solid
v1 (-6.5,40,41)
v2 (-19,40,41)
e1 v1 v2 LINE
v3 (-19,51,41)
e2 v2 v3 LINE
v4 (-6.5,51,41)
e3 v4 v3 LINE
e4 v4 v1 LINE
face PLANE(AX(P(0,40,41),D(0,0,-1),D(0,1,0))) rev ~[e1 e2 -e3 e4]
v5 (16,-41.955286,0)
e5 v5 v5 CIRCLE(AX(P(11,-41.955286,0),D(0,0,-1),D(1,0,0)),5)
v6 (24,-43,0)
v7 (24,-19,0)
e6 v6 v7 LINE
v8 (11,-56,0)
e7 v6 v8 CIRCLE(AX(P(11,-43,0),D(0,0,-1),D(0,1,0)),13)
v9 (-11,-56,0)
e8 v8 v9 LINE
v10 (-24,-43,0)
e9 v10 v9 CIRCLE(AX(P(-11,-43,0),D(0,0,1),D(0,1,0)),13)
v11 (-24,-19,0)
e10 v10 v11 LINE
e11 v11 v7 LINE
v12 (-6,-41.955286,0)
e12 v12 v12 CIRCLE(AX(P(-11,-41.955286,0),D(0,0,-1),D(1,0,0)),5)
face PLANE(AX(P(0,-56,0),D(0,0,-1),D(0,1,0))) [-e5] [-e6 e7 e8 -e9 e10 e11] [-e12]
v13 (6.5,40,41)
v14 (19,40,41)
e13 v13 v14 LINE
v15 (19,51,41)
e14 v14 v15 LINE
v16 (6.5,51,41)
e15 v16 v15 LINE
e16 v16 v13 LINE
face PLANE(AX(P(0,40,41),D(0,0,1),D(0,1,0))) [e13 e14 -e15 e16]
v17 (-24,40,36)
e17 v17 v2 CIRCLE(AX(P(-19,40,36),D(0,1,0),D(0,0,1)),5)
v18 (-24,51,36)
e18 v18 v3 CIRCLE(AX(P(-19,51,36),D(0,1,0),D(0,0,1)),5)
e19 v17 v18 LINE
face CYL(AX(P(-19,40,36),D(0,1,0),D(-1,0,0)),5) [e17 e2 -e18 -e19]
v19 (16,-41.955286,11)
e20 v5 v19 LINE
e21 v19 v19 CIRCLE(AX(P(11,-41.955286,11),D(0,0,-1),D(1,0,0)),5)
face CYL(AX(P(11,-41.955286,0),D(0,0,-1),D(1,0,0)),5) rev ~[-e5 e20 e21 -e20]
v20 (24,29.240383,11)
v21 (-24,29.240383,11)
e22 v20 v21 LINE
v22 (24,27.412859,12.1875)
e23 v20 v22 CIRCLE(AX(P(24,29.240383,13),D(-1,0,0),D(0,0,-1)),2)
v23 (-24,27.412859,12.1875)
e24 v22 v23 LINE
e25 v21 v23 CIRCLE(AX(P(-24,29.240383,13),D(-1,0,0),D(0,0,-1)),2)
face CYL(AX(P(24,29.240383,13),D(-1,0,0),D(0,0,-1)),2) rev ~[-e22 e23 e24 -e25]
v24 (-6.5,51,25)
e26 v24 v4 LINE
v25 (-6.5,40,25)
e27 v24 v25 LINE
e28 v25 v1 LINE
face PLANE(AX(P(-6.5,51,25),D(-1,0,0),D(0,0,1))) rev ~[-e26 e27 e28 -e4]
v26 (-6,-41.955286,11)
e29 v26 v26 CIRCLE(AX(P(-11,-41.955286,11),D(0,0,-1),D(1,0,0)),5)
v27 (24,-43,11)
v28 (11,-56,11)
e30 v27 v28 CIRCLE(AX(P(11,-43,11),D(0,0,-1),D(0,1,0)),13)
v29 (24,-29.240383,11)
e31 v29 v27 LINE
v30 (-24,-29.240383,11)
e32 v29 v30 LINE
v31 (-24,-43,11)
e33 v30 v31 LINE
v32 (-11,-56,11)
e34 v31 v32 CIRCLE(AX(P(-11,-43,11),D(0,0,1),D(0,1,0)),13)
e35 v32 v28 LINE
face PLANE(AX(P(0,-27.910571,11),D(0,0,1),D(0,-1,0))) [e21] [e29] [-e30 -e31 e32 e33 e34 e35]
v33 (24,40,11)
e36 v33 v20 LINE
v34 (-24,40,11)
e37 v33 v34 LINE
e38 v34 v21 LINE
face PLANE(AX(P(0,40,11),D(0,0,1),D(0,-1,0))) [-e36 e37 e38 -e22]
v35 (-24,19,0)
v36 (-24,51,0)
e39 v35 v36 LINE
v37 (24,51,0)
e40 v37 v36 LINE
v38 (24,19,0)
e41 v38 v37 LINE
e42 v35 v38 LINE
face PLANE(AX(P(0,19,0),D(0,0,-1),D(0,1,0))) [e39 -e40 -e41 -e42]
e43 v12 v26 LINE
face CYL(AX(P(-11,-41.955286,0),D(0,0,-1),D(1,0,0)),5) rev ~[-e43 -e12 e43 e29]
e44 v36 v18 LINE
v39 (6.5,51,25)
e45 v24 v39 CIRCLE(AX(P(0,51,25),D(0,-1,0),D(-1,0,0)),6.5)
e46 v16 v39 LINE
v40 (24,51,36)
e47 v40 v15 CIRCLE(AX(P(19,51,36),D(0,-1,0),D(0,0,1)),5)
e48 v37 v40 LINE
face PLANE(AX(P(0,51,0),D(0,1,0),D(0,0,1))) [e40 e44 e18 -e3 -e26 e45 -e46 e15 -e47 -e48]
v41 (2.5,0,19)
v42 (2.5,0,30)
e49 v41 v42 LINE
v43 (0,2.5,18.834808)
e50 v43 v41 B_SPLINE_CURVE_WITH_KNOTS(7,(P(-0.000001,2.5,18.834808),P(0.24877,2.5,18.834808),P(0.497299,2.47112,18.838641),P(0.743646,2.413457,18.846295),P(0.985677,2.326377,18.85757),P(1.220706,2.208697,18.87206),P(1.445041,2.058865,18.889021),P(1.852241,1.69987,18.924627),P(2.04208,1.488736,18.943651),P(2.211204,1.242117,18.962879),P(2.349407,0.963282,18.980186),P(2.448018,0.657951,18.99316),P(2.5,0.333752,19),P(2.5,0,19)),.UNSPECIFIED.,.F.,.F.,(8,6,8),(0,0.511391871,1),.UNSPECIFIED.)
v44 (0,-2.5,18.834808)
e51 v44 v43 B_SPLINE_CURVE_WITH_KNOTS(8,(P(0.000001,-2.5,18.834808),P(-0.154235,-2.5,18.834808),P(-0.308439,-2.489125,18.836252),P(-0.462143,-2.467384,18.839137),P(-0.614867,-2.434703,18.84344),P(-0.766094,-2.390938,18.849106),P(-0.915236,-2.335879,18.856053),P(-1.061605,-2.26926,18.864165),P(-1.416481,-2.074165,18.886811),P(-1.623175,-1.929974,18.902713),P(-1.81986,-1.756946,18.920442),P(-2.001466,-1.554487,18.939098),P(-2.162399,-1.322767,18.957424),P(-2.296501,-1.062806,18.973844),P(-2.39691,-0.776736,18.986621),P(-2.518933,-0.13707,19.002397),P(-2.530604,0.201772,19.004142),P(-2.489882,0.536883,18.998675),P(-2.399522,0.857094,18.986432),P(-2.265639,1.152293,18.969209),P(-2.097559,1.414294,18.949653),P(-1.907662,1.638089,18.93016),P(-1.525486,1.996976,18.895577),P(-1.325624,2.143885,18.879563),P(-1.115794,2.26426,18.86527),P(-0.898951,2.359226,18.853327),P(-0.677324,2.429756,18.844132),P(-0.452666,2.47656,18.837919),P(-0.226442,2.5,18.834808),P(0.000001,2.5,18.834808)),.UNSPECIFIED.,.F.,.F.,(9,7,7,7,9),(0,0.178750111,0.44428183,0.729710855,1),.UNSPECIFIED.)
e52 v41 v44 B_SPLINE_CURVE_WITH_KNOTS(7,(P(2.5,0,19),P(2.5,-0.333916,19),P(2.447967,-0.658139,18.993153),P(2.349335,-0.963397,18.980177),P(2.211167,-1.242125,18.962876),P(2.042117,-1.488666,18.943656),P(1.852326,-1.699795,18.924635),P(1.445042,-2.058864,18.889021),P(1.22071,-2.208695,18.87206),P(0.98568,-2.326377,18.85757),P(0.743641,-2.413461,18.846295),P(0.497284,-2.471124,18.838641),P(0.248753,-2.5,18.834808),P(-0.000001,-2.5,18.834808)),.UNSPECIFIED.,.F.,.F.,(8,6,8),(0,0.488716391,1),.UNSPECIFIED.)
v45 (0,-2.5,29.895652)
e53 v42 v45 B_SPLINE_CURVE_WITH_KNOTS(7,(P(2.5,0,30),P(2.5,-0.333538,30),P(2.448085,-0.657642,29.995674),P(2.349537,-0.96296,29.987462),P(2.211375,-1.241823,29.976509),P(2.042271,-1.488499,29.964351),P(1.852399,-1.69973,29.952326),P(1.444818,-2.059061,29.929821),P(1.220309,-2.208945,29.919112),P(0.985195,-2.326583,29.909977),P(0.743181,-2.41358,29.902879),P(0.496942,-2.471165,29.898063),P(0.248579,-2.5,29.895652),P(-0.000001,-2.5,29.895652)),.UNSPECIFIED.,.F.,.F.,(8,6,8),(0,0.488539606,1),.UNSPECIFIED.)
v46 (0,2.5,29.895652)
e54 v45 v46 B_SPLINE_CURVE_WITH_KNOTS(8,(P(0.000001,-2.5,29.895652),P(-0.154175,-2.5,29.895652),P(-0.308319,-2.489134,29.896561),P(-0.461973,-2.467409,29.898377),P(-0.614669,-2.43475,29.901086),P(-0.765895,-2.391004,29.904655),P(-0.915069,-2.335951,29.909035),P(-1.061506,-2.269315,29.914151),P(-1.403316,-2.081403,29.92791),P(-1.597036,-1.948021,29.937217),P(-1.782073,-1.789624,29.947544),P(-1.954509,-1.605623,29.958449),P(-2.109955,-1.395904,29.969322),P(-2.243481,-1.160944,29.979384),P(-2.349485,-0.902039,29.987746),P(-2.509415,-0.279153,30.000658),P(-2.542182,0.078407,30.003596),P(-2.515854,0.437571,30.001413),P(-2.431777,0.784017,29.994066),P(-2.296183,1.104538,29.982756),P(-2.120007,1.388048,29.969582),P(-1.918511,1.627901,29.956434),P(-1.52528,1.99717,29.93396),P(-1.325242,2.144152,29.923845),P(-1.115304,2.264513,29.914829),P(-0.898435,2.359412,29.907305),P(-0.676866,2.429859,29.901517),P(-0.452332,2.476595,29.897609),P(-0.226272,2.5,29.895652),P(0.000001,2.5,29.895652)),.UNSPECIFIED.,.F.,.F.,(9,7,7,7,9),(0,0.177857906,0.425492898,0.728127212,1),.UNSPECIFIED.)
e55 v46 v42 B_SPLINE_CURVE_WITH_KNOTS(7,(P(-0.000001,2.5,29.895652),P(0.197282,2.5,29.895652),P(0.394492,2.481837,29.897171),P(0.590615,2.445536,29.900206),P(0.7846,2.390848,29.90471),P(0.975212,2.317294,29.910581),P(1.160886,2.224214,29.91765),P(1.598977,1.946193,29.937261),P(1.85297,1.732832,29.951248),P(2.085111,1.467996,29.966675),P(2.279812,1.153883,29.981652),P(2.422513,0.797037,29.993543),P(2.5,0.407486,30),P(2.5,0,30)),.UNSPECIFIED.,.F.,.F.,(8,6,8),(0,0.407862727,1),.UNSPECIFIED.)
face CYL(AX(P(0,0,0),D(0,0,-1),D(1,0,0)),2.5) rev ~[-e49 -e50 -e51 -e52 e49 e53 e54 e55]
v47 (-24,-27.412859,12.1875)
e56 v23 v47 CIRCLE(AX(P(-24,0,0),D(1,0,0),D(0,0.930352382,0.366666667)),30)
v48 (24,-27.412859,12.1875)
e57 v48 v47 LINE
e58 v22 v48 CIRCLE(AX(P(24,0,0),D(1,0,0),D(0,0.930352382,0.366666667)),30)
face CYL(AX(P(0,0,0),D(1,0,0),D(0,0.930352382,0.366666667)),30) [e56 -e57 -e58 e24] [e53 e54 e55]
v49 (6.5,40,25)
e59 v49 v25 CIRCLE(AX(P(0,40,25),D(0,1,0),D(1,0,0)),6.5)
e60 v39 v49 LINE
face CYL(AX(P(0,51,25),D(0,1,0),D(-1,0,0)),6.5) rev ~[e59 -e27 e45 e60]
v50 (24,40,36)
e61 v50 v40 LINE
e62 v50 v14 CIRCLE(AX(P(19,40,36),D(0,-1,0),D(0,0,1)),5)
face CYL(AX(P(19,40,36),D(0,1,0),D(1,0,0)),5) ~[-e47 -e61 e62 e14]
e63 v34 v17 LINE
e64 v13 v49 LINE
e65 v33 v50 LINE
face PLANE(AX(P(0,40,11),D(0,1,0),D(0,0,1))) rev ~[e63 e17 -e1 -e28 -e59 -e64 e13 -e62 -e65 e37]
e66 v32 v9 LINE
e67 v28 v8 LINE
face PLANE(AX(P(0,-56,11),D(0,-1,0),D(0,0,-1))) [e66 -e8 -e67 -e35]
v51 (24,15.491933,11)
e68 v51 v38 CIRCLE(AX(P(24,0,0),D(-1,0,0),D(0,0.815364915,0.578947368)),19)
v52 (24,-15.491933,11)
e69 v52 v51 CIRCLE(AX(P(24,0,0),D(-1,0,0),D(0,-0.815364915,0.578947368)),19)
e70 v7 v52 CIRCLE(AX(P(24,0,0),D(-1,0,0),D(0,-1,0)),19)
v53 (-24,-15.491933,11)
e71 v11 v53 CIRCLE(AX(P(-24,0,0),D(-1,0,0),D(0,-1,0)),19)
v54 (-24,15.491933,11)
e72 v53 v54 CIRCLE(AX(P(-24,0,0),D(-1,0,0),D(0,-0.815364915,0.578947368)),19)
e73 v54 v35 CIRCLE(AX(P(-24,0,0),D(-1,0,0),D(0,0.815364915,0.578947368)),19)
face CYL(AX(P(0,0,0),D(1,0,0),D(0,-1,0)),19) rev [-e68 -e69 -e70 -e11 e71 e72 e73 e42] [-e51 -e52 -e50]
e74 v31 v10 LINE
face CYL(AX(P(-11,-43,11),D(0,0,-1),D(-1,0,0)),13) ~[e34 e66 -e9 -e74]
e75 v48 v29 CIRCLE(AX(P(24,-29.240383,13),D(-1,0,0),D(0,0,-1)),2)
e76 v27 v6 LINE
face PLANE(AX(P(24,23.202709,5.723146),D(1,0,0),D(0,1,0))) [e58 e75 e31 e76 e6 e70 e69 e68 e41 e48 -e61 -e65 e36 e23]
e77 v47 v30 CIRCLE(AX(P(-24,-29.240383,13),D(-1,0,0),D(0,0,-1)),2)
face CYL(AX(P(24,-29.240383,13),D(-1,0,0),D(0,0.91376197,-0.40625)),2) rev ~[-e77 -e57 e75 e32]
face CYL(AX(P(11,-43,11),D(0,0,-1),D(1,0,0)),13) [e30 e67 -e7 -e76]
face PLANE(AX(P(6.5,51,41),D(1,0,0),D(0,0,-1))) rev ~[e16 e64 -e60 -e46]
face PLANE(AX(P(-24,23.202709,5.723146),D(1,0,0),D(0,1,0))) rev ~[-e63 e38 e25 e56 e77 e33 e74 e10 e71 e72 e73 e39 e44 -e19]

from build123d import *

# Parameters (mm, degrees)
F0_W     = 11
F0_H     = 30
F1_DEPTH = 24
F3_DEPTH = 11
F4_R     = 2.5
F4_R_2   = 5
F5_DEPTH = 41.001
F6_R     = 13
F7_R     = 5
F8_R     = 2


with BuildPart() as f1:
    # F0 (on Right) → F1 (new body, symmetric)
    with BuildSketch(Plane.YZ):
        with BuildLine():
            ThreePointArc((15.4919333848, 11), (18.1017503893, 5.7729223833), (19, 0))
            Line((19, 0), (30, 0))
            ThreePointArc((30, 0), (29.4730143031, 5.5983415304), (27.9105714739, 11))
            Line((27.9105714739, 11), (15.4919333848, 11))
        make_face()
        with BuildLine():
            ThreePointArc((-15.4919333848, 11), (0, 19), (15.4919333848, 11))
            Line((15.4919333848, 11), (27.9105714739, 11))
            ThreePointArc((27.9105714739, 11), (0, 30), (-27.9105714739, 11))
            Line((-27.9105714739, 11), (-15.4919333848, 11))
        make_face()
        with BuildLine():
            Line((-30, 0), (-19, 0))
            ThreePointArc((-19, 0), (-18.1017503893, 5.7729223833), (-15.4919333848, 11))
            Line((-15.4919333848, 11), (-27.9105714739, 11))
            ThreePointArc((-27.9105714739, 11), (-29.4730143031, 5.5983415304), (-30, 0))
        make_face()
        with BuildLine():
            ThreePointArc((27.9105714739, 11), (29.4730143031, 5.5983415304), (30, 0))
            Line((30, 0), (51, 0))
            Line((51, 0), (51, 11))
            Line((51, 11), (40, 11))
            Line((40, 11), (27.9105714739, 11))
        make_face()
        with BuildLine():
            Line((-56, 0), (-30, 0))
            ThreePointArc((-30, 0), (-29.4730143031, 5.5983415304), (-27.9105714739, 11))
            Line((-27.9105714739, 11), (-56, 11))
            Line((-56, 11), (-56, 0))
        make_face()
        with Locations((45.5, 26)):
            Rectangle(F0_W, F0_H)
    extrude(amount=F1_DEPTH, both=True)

    # F2 (on face) → F3 (cut, through all)
    with BuildSketch(Plane(origin=(0, 51, 0), x_dir=(-1, 0, 0), z_dir=(0, 1, 0))):
        with BuildLine():
            ThreePointArc((-6.5, 25), (0, 18.5), (6.5, 25))
            ThreePointArc((6.5, 25), (0, 31.5), (-6.5, 25))
        make_face()
        with BuildLine():
            ThreePointArc((-6.5, 25), (0, 31.5), (6.5, 25))
            Line((6.5, 25), (6.5, 41))
            Line((6.5, 41), (-6.5, 41))
            Line((-6.5, 41), (-6.5, 25))
        make_face()
    extrude(amount=-F3_DEPTH, mode=Mode.SUBTRACT)

    # F4 (on face) → F5 (cut, through all)
    with BuildSketch(Plane(origin=(0, 0, 0), x_dir=(1, 0, 0), z_dir=(0, 0, -1))):
        Circle(F4_R)
        with Locations((-11, 41.955285737)):
            Circle(F4_R_2)
        with Locations((11, 41.955285737)):
            Circle(F4_R_2)
    extrude(amount=-F5_DEPTH, mode=Mode.SUBTRACT)

    # F6
    f6_edges = [f1.edges().sort_by_distance(p)[0] for p in [
        (24, -56, 5.5),
        (-24, -56, 5.5),
    ]]
    fillet(f6_edges, radius=F6_R)

    # F7
    f7_edges = [f1.edges().sort_by_distance(p)[0] for p in [
        (24, 45.5, 41),
        (-24, 45.5, 41),
    ]]
    fillet(f7_edges, radius=F7_R)

    # F8
    f8_edges = [f1.edges().sort_by_distance(p)[0] for p in [
        (0, -27.910571, 11),
        (0, 27.910571, 11),
    ]]
    fillet(f8_edges, radius=F8_R)


solid = f1.part
